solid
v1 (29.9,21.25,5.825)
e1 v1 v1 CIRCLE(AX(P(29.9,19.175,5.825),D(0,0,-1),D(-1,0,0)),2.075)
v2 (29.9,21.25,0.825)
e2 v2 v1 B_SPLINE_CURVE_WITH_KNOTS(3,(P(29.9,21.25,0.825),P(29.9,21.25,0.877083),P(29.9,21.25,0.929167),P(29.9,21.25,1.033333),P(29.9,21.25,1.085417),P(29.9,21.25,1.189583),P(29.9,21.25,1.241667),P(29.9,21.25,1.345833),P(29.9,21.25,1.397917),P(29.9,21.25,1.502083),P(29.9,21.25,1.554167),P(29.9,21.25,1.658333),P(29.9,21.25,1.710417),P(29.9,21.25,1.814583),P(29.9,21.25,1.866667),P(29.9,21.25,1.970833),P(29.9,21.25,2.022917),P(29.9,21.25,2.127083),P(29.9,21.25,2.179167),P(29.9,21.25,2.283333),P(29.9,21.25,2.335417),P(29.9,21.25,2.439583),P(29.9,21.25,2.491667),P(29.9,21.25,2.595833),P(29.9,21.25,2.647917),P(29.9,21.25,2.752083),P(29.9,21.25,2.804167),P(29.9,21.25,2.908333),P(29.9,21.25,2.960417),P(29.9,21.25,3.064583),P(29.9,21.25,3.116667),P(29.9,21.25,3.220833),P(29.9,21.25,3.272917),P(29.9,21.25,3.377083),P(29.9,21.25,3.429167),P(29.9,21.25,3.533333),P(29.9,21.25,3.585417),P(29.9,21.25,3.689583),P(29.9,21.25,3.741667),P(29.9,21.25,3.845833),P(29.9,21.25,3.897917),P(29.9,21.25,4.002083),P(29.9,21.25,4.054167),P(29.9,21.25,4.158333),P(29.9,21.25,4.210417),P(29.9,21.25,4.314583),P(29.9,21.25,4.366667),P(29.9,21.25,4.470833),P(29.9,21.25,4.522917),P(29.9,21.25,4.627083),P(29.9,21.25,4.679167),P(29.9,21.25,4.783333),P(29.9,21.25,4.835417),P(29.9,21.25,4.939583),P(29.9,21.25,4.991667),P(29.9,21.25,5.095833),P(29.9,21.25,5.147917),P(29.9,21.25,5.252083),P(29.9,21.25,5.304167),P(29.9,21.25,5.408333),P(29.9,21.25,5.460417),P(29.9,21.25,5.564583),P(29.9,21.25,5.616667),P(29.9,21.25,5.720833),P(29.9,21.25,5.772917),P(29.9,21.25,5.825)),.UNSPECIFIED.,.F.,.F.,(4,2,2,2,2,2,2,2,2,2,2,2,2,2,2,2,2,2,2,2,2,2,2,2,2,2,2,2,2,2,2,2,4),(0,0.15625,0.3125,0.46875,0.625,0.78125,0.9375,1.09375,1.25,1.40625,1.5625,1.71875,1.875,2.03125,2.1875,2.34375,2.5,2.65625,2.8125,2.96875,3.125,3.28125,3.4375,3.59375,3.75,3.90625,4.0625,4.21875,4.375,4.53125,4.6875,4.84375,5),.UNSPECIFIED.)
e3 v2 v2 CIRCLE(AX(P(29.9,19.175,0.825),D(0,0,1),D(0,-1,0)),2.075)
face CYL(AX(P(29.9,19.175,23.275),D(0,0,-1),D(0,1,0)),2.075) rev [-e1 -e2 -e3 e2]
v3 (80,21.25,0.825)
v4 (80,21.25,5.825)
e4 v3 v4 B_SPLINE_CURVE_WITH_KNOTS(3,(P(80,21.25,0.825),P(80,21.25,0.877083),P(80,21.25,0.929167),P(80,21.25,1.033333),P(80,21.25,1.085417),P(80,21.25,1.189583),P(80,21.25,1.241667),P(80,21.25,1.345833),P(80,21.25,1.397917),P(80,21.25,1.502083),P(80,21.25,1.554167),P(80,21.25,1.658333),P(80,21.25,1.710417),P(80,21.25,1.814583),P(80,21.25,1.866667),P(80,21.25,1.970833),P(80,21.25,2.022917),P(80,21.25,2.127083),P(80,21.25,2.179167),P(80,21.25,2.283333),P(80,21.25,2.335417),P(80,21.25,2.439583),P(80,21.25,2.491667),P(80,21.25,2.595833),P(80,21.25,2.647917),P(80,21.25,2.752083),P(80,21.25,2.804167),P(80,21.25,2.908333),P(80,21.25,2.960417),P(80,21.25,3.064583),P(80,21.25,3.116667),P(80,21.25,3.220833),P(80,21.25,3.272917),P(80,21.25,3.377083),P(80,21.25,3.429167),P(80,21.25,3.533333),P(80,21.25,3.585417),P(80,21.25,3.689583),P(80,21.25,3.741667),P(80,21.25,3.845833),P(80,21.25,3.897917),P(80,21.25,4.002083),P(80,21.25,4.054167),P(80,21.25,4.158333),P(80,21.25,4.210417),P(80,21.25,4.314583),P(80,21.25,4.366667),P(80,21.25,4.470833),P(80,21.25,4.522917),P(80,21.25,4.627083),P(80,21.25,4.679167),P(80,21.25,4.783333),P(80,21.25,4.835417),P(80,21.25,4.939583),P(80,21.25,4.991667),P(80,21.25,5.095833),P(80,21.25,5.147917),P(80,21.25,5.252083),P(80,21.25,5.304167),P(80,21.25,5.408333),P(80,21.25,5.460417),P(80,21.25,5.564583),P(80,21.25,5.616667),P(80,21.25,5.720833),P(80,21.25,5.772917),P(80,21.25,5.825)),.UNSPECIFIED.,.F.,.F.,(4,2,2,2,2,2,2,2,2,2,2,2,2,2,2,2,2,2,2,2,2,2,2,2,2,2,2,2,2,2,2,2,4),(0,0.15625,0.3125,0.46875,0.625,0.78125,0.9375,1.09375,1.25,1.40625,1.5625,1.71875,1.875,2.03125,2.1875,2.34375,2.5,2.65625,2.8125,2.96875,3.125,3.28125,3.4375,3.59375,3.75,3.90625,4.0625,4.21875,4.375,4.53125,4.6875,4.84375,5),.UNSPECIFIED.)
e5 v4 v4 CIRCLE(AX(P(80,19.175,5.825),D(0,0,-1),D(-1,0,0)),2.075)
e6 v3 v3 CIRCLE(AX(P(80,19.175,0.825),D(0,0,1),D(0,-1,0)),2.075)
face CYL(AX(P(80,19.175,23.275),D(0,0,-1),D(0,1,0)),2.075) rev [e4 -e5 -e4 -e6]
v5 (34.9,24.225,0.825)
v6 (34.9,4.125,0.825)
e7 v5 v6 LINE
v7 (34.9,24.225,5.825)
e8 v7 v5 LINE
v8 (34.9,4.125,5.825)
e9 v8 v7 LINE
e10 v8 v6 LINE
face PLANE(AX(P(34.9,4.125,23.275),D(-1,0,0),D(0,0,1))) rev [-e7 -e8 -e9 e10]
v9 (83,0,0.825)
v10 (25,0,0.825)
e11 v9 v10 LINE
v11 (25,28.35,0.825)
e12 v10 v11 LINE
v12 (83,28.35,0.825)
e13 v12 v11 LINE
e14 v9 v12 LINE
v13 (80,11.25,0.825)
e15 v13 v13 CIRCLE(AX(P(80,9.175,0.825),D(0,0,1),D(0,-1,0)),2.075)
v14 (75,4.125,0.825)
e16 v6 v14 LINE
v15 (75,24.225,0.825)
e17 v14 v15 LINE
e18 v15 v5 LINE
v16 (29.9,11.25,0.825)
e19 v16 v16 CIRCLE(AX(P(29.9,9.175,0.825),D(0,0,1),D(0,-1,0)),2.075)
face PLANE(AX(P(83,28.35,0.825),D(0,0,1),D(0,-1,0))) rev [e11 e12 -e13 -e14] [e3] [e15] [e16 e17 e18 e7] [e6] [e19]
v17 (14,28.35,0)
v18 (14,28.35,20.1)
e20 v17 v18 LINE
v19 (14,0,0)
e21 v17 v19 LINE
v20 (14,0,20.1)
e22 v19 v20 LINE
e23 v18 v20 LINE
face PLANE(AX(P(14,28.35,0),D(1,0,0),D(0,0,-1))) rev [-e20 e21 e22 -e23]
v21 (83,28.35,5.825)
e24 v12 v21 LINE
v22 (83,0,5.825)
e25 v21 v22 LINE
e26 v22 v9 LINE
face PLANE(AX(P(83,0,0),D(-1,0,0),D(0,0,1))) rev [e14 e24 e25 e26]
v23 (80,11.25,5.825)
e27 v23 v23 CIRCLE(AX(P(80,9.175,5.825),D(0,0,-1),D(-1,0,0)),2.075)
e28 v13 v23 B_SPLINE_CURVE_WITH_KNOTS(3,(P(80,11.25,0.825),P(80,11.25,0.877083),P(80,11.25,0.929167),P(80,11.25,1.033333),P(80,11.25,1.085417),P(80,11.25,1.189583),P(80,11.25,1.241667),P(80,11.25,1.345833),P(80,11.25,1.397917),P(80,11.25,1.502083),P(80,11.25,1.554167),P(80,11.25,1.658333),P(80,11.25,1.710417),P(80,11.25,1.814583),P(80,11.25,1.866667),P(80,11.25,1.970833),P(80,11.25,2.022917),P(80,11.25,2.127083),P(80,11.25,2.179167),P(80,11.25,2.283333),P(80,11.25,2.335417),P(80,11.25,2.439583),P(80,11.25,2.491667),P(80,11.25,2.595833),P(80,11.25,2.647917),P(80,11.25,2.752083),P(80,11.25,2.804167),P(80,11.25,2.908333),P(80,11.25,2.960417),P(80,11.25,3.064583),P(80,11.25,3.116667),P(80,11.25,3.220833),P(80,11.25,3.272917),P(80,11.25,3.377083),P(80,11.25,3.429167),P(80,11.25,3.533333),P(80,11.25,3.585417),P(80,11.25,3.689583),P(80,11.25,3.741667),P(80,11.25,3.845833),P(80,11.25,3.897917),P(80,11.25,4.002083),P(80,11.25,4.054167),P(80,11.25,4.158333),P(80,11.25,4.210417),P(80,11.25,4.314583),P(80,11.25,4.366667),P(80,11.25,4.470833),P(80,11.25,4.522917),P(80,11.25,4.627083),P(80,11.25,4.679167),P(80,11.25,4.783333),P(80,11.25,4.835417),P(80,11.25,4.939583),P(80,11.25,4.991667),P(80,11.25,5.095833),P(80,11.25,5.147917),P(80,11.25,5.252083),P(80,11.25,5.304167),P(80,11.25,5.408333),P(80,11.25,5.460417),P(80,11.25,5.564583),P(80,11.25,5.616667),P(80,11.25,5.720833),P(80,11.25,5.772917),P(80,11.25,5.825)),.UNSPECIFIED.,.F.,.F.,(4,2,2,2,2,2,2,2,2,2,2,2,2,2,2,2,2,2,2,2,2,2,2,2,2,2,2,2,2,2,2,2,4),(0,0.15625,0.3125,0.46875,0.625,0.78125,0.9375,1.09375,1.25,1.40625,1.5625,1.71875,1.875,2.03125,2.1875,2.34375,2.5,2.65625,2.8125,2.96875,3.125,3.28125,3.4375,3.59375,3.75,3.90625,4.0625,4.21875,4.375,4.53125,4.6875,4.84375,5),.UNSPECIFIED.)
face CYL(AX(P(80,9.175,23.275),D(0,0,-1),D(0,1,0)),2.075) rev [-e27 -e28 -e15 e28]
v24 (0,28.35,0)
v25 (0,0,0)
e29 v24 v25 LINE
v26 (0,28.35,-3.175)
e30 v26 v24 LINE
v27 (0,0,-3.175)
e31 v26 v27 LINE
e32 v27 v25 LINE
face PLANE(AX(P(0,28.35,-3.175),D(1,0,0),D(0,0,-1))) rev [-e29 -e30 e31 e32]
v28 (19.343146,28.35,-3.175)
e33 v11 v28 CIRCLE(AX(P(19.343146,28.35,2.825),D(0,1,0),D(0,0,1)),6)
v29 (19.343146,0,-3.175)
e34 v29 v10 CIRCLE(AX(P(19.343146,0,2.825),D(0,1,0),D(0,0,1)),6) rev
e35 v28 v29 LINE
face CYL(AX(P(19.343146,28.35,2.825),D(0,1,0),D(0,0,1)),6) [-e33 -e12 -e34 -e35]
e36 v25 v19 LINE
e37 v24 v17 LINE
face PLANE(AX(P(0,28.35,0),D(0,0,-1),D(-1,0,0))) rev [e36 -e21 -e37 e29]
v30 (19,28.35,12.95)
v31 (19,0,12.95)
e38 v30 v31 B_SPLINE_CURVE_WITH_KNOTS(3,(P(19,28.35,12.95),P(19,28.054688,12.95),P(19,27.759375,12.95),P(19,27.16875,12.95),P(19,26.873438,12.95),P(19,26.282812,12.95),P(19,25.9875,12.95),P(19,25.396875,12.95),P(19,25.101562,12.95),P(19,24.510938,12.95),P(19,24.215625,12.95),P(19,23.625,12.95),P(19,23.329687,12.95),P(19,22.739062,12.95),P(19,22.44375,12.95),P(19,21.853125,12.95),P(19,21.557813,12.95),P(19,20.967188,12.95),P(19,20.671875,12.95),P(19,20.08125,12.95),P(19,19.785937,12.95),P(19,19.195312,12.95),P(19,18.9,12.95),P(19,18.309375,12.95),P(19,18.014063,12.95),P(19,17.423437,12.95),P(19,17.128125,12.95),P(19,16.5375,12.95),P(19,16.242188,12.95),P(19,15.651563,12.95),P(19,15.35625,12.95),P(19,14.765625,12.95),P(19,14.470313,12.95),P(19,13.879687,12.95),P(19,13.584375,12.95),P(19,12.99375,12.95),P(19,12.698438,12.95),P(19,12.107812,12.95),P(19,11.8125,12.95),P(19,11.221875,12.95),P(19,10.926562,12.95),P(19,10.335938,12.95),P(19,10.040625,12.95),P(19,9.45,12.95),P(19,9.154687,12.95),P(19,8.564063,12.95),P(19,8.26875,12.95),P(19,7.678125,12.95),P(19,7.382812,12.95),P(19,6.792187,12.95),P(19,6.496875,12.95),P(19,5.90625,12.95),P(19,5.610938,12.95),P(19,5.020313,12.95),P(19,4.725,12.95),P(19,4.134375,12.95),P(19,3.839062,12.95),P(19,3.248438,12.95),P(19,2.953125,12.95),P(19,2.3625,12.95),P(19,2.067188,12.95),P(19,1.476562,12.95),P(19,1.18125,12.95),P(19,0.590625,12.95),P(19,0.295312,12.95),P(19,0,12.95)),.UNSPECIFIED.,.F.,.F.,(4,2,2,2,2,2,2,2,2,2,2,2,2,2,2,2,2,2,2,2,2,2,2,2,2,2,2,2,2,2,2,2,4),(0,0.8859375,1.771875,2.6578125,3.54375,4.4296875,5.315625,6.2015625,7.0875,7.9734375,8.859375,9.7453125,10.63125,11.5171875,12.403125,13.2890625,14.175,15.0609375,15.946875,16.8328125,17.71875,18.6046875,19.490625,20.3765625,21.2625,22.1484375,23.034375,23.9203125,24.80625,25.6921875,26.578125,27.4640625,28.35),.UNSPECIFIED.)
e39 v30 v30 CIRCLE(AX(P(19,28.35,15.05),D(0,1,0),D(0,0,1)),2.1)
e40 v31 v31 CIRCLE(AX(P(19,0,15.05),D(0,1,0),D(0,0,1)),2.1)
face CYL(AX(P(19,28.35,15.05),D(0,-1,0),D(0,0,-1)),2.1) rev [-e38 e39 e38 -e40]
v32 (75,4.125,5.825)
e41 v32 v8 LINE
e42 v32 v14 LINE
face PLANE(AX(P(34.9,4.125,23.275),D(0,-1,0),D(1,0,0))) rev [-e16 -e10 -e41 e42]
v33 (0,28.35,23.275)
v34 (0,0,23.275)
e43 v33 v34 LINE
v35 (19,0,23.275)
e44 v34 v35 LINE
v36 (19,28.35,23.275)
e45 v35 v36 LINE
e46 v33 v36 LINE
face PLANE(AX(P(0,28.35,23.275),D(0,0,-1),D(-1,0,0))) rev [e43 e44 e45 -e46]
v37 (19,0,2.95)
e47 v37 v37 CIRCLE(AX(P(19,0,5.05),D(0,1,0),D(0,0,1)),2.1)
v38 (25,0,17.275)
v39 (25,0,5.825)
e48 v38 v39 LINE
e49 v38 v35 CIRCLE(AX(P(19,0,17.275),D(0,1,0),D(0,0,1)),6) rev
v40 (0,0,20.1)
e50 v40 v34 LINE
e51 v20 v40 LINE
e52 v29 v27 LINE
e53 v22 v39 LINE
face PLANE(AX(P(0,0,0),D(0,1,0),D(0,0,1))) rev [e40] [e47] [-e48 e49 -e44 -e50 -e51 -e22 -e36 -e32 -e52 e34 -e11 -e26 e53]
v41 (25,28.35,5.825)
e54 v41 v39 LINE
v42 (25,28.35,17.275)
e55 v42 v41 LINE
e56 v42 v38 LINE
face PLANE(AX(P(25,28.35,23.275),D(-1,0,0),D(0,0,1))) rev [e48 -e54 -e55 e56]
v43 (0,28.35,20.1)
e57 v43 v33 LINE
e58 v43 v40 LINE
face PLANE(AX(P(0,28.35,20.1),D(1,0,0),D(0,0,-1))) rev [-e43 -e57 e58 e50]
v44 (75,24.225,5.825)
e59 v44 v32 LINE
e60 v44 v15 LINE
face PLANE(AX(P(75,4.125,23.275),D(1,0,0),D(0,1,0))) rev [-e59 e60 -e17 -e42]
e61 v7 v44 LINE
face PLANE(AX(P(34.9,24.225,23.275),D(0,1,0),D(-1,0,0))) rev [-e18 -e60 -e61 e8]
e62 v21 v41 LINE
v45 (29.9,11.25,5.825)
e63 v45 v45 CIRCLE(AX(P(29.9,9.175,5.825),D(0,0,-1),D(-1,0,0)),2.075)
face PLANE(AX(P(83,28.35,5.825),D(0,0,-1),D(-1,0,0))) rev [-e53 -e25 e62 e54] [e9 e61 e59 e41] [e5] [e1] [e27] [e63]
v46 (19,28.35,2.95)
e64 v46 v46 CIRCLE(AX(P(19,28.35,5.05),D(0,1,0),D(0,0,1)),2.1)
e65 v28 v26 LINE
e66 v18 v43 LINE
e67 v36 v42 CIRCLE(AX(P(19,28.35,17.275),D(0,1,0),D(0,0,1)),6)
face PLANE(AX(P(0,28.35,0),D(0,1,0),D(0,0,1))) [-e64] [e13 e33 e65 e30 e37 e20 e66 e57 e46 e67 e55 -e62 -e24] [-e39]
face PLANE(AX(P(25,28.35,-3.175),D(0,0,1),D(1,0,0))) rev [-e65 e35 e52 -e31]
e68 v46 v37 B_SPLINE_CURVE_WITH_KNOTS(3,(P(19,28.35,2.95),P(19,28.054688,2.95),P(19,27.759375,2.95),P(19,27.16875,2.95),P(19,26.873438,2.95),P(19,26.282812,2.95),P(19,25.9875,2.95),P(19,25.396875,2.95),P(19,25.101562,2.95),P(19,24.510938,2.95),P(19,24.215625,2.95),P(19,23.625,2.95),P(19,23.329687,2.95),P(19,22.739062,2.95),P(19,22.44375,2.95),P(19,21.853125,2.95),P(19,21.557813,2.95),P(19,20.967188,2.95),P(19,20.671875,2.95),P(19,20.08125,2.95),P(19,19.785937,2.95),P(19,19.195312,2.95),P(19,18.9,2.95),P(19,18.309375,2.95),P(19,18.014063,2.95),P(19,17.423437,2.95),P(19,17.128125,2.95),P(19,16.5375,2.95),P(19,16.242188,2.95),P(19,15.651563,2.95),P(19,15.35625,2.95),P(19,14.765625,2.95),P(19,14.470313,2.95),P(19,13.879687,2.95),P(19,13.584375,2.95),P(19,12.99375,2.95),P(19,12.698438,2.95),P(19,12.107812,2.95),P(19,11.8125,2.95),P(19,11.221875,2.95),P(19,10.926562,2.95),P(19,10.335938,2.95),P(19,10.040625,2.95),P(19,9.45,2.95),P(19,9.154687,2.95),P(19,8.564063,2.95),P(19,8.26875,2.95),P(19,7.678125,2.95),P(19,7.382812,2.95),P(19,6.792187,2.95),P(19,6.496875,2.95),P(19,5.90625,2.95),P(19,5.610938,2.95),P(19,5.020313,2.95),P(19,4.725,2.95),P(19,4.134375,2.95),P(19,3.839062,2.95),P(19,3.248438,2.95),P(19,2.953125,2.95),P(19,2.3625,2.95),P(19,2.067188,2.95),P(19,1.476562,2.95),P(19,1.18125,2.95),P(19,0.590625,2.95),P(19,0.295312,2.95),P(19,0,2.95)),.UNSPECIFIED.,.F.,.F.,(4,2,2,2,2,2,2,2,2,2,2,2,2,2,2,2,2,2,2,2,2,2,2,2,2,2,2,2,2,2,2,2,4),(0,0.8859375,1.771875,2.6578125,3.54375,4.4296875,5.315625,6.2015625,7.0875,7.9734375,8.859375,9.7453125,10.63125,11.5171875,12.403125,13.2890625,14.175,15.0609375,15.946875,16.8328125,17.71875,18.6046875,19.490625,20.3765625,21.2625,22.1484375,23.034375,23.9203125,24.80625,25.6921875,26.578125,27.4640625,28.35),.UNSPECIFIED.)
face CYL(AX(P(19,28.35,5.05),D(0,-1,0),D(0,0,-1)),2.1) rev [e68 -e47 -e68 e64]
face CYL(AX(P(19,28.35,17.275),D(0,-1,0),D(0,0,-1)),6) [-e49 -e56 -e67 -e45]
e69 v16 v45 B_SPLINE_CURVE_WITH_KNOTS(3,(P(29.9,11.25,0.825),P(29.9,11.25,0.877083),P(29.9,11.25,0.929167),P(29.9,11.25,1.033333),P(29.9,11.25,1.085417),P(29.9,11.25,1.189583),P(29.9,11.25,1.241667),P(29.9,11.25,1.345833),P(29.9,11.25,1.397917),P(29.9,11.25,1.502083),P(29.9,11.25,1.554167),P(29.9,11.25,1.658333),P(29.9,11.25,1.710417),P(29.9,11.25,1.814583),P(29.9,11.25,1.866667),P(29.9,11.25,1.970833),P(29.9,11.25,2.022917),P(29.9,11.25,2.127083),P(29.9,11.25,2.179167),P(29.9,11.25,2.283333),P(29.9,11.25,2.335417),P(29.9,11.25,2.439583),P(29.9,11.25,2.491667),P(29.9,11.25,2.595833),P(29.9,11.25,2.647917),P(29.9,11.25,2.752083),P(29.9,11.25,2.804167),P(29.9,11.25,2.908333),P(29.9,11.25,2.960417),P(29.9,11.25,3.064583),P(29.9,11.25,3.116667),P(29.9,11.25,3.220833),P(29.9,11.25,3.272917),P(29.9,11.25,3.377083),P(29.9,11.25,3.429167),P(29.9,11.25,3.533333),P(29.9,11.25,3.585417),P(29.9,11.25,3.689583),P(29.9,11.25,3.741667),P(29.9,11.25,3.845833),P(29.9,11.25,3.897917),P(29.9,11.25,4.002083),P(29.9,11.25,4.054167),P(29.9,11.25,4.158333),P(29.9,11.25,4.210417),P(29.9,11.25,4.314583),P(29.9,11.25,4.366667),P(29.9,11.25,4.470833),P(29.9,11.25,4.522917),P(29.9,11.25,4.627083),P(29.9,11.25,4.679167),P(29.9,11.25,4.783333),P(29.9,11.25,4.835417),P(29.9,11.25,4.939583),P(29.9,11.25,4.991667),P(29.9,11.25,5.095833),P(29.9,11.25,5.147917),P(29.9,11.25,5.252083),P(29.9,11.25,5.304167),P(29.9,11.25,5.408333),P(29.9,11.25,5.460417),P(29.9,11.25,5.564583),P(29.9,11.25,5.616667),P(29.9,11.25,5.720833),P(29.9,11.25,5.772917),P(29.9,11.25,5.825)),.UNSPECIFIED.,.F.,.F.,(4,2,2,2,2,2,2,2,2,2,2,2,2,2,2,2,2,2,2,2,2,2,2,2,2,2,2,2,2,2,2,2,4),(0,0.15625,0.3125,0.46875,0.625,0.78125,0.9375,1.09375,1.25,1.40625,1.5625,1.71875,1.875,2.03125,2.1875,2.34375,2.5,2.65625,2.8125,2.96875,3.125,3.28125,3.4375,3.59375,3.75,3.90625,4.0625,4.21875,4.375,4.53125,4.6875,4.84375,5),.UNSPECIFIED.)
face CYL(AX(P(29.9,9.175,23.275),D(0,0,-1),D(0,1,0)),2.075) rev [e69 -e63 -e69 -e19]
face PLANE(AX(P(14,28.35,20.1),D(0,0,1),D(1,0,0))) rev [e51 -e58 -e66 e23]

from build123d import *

# Parameters (mm, degrees)
SKETCH1_R               = 2.1
BOSS_EXTRUDE1_DEPTH     = 28.35
SKETCH2_W               = 5
SKETCH2_H               = 28.35
BOSS_EXTRUDE2_DEPTH     = 58
CUT_EXTRUDE1_DEPTH      = 91.535766413
CUT_EXTRUDE1_DEPTH_BACK = 91.535766413
SKETCH3_W               = 40.1
SKETCH3_H               = 20.1
CUT_EXTRUDE2_DEPTH      = 91.535766413
CUT_EXTRUDE2_DEPTH_BACK = 91.535766413
SKETCH4_R               = 2.075
FILLET1_R               = 6


with BuildPart() as part:
    # Sketch1 → Boss-Extrude1 (new body)
    with BuildSketch(Plane(origin=(0, 0, 0), x_dir=(1, 0, 0), z_dir=(0, 1, 0))):
        Polygon((0, 0), (14, 0), (14, -20.1), (0, -20.1), (0, -23.275), (25, -23.275), (25, 3.175), (0, 3.175), align=None)
        with Locations(Location((19, -5.05, 0), (0, 0, 90))):
            Circle(SKETCH1_R, mode=Mode.SUBTRACT)
        with Locations(Location((19, -15.05, 0), (0, 0, 90))):
            Circle(SKETCH1_R, mode=Mode.SUBTRACT)
    extrude(amount=BOSS_EXTRUDE1_DEPTH)

    # Sketch2 → Boss-Extrude2 (add)
    with BuildSketch(Plane(origin=(25, 0, 0), x_dir=(0, 0, -1), z_dir=(1, 0, 0))):
        with Locations((-3.325, 14.175)):
            Rectangle(SKETCH2_W, SKETCH2_H)
    extrude(amount=BOSS_EXTRUDE2_DEPTH)

    # Sketch3 → Cut-Extrude1 (cut, two sides: drawn at the far end of the back side and taken through both)
    with BuildSketch(Plane(origin=(0, 0, 0.825), x_dir=(-1, 0, 0), z_dir=(0, 0, -1)).offset(-CUT_EXTRUDE1_DEPTH_BACK)):
        with Locations((-54.95, 14.175)):
            Rectangle(SKETCH3_W, SKETCH3_H)
    extrude(amount=CUT_EXTRUDE1_DEPTH + CUT_EXTRUDE1_DEPTH_BACK, mode=Mode.SUBTRACT)

    # Sketch4 → Cut-Extrude2 (cut, two sides: drawn at the far end of the back side and taken through both)
    with BuildSketch(Plane(origin=(0, 0, 0.825), x_dir=(-1, 0, 0), z_dir=(0, 0, -1)).offset(-CUT_EXTRUDE2_DEPTH_BACK)):
        with Locations(Location((-29.9, 19.175, 0), (0, 0, 90))):
            Circle(SKETCH4_R)
        with Locations(Location((-29.9, 9.175, 0), (0, 0, 90))):
            Circle(SKETCH4_R)
        with Locations(Location((-80, 19.175, 0), (0, 0, 90))):
            Circle(SKETCH4_R)
        with Locations(Location((-80, 9.175, 0), (0, 0, 90))):
            Circle(SKETCH4_R)
    extrude(amount=CUT_EXTRUDE2_DEPTH + CUT_EXTRUDE2_DEPTH_BACK, mode=Mode.SUBTRACT)

    # Fillet1
    # the kernel refuses this fillet: 6 mm, written as the material it takes off along each edge
    with BuildSketch(Plane(origin=(25, -14.142135624, -3.175), x_dir=(-1, 0, 0), z_dir=(0, 1, 0))) as fillet1_piece_1:
        with BuildLine():
            CenterArc((5.656854249, 6), FILLET1_R, 199.471220634, 70.528779366)
            Line((0, 4), (-0.113137085, 3.96))
            ThreePointArc((-0.113137085, 3.96), (-0.12, 2), (-0.12, 0))
            Line((-0.12, 0), (0, -0.12))
            Line((0, -0.12), (5.656854249, -0.12))
            Line((5.656854249, -0.12), (5.656854249, 0))
        make_face()
    extrude(amount=56.634271247, mode=Mode.SUBTRACT)
    with BuildSketch(Plane(origin=(25, -15, 23.275), x_dir=(-1, 0, 0), z_dir=(0, 1, 0))) as fillet1_piece_2:
        with BuildLine():
            CenterArc((FILLET1_R, -FILLET1_R), FILLET1_R, 90, 90)
            Line((0, -FILLET1_R), (-FILLET1_R * 0.02, -FILLET1_R))
            Line((-FILLET1_R * 0.02, -FILLET1_R), (-FILLET1_R * 0.02, FILLET1_R * 0.02))
            Line((-FILLET1_R * 0.02, FILLET1_R * 0.02), (FILLET1_R, FILLET1_R * 0.02))
            Line((FILLET1_R, FILLET1_R * 0.02), (FILLET1_R, 0))
        make_face()
    extrude(amount=58.35, mode=Mode.SUBTRACT)


solid = part.part
